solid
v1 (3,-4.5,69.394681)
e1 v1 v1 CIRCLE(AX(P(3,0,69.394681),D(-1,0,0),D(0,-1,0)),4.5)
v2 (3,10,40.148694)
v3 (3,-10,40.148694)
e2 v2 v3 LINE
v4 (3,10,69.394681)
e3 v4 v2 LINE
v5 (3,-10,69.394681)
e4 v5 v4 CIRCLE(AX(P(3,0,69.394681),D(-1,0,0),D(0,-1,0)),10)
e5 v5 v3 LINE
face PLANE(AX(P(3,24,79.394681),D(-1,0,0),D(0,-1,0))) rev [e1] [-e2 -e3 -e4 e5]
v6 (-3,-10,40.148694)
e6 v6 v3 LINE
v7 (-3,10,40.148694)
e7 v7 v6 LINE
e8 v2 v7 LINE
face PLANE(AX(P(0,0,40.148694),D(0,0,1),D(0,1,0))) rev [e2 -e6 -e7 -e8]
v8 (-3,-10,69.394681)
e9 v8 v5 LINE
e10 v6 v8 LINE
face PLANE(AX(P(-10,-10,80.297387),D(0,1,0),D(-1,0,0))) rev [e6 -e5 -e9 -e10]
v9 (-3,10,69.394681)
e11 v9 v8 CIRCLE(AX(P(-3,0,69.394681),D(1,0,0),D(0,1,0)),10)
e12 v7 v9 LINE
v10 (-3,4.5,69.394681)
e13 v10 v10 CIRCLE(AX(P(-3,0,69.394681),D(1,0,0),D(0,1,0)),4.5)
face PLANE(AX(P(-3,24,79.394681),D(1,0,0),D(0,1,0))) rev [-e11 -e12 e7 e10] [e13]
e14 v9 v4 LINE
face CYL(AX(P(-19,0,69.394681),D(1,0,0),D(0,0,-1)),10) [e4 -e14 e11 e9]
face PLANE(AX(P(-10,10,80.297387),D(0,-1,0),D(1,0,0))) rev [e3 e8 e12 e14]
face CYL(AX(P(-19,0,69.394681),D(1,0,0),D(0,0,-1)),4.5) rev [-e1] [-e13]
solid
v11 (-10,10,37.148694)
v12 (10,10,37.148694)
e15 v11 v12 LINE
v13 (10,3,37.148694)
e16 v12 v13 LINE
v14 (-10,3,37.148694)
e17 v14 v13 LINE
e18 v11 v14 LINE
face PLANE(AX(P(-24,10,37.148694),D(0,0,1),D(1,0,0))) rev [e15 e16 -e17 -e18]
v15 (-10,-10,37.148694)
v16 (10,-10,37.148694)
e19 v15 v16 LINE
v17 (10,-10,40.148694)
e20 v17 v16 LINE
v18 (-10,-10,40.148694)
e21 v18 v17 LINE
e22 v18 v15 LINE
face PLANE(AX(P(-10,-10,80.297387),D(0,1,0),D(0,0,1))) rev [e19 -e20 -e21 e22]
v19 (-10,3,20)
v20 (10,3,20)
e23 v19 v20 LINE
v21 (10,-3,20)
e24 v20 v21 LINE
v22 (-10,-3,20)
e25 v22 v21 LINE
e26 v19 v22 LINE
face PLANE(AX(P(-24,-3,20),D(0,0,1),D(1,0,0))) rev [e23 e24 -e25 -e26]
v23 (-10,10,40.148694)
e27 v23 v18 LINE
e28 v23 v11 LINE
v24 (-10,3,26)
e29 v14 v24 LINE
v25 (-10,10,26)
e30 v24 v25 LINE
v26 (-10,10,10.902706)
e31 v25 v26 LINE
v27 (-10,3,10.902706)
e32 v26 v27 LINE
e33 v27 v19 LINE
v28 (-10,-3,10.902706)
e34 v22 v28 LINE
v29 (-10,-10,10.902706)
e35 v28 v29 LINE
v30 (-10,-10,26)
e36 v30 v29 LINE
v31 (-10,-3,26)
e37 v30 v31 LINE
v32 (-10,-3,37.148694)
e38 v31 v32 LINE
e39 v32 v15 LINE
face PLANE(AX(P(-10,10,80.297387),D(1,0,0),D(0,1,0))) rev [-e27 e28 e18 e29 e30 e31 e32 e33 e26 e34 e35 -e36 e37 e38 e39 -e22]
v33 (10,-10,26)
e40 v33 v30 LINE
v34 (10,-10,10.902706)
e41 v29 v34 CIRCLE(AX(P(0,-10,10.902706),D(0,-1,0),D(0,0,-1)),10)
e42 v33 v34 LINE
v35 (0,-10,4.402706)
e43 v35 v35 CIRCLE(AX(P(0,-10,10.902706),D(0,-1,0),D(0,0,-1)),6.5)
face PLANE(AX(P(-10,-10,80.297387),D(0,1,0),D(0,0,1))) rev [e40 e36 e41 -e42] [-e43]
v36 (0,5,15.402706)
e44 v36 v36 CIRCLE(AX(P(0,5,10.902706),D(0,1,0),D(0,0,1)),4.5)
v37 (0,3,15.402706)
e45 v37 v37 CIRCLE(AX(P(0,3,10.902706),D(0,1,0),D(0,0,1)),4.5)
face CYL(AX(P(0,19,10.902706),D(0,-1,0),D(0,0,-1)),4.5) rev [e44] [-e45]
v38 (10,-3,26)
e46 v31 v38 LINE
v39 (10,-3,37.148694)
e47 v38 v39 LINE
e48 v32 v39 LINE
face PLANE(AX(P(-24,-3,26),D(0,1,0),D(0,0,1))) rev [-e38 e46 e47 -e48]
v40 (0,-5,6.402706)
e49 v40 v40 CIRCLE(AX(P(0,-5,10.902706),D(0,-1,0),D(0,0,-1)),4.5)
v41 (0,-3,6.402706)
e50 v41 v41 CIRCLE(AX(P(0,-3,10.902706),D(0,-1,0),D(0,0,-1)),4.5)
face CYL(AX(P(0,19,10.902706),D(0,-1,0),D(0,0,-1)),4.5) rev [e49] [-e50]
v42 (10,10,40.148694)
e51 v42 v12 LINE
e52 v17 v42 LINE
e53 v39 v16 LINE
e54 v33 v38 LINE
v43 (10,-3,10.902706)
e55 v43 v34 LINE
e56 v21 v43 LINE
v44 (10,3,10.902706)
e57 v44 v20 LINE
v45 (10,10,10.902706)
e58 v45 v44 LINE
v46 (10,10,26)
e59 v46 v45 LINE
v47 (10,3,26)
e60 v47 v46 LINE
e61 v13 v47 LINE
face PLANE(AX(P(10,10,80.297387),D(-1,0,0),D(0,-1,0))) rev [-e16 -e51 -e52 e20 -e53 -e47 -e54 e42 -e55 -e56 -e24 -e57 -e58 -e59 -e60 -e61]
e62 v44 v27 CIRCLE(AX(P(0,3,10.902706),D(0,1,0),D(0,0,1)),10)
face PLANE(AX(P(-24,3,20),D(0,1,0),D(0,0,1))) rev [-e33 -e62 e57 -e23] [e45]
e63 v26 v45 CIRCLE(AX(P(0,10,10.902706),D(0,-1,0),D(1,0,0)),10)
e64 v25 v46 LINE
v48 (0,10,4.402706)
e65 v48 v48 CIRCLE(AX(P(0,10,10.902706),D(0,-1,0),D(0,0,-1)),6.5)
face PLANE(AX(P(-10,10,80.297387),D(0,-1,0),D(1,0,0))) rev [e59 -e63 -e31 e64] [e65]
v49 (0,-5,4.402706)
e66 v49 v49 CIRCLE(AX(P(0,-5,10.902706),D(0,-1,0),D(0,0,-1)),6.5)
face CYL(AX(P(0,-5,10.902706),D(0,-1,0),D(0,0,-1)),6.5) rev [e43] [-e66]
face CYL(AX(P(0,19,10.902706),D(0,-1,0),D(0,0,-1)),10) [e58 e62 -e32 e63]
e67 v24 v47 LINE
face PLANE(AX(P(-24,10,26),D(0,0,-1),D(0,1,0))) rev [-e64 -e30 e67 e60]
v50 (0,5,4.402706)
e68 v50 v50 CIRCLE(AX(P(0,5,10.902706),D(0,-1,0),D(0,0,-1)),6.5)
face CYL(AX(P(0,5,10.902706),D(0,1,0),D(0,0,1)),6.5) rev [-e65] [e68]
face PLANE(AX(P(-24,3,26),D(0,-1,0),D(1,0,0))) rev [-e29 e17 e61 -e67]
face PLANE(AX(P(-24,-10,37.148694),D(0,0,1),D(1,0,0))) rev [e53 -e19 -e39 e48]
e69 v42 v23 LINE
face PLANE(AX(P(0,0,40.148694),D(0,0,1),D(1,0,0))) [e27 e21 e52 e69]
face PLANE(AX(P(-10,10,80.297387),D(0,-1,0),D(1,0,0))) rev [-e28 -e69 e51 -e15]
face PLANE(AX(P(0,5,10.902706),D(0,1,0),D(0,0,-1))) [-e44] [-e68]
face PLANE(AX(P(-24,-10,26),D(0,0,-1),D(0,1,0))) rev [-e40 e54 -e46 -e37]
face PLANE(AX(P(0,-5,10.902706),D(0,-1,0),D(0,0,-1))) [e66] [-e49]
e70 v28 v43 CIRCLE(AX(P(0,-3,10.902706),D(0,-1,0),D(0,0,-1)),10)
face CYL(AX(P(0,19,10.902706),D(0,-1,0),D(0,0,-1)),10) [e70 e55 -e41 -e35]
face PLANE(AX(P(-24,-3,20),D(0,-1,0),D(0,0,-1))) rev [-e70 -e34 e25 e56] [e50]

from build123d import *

# Parameters (mm, degrees)
SKETCH_1_W          = 20
SKETCH_1_H          = 20
EXTRUDE_1_DEPTH     = 80.297387422
SKETCH_7_W          = 20
SKETCH_7_H          = 6
SKETCH_7_W_2        = 11.148693711
SKETCH_7_H_2        = 7
CUT_EXTRUDE_6_DEPTH = 34
SKETCH_2_R          = 6.5
CUT_EXTRUDE_1_DEPTH = 5
SKETCH_3_R          = 4.5
CUT_EXTRUDE_2_DEPTH = 29
MOVE_BODY_1_ANGLE   = 90
SKETCH_9_W          = 7
SKETCH_9_H          = 39.245987558
CUT_EXTRUDE_7_DEPTH = 34


# Read off the part's stored shape, not the designer's step: 교차3
with BuildPart() as part:
    # 스케치1 → 보스-돌출1 (new body)
    with BuildSketch(Plane.XY):
        Rectangle(SKETCH_1_W, SKETCH_1_H)
    extrude(amount=EXTRUDE_1_DEPTH)

    # 스케치7 → 컷-돌출6 (cut)
    with BuildSketch(Plane(origin=(10, 0, 0), x_dir=(0, 0, -1), z_dir=(1, 0, 0))):
        with Locations((-10, 0)):
            Rectangle(SKETCH_7_W, SKETCH_7_H)
        with Locations((-31.574346855, 6.5)):
            Rectangle(SKETCH_7_W_2, SKETCH_7_H_2)
        with Locations((-31.574346855, -6.5)):
            Rectangle(SKETCH_7_W_2, SKETCH_7_H_2)
    extrude(amount=-CUT_EXTRUDE_6_DEPTH, mode=Mode.SUBTRACT)

    # 스케치2 → 컷-돌출1 (cut)
    with BuildSketch(Plane(origin=(0, -10, 0), x_dir=(-1, 0, 0), z_dir=(0, -1, 0))):
        with Locations(Location((0, -10.902706153, 0), (0, 0, 90))):
            Circle(SKETCH_2_R)
    cut_extrude_1 = extrude(amount=-CUT_EXTRUDE_1_DEPTH, mode=Mode.SUBTRACT)

    # 대칭 복사7: 컷-돌출1 across plane
    add(cut_extrude_1.mirror(Plane.ZX), mode=Mode.SUBTRACT)

    # 스케치3 → 컷-돌출2 (cut)
    with BuildSketch(Plane(origin=(0, -10, 0), x_dir=(-1, 0, 0), z_dir=(0, -1, 0))):
        with Locations(Location((0, -10.902706153, 0), (0, 0, 270))):
            Circle(SKETCH_3_R)
        with BuildLine():
            Line((-21.262122506, -10.902706153), (-10, -10.902706153))
            ThreePointArc((-10, -10.902706153), (0, -0.902706153), (10, -10.902706153))
            Line((10, -10.902706153), (21.262122506, -10.902706153))
            ThreePointArc((21.262122506, -10.902706153), (0, 10.359416353), (-21.262122506, -10.902706153))
        make_face()
    cut_extrude_2 = extrude(amount=-CUT_EXTRUDE_2_DEPTH, mode=Mode.SUBTRACT)

    # 대칭 복사6: 컷-돌출2 across plane
    add(cut_extrude_2.mirror(Plane.XY.offset(40.148693711)), mode=Mode.SUBTRACT)


with BuildPart() as body_2:
    # 교차3: the piece on the far side of the plane
    add(part.part)
    split(bisect_by=Plane.XY.offset(40.148693711), keep=Keep.BOTTOM)


with BuildPart() as part_1:
    add(part.part)

    # 교차3
    split(bisect_by=Plane.XY.offset(40.148693711), keep=Keep.TOP)


with BuildPart() as part_2:
    # Move Body 1: moved
    add(part_1.part.rotate(Axis((0, 0, 0), (0, 0, 1)), MOVE_BODY_1_ANGLE))

    # 스케치9 → 컷-돌출7 (cut)
    with BuildSketch(Plane.XZ.offset(10)):
        with Locations((6.5, 59.77168749)):
            Rectangle(SKETCH_9_W, SKETCH_9_H)
        with Locations((-6.5, 59.77168749)):
            Rectangle(SKETCH_9_W, SKETCH_9_H)
    extrude(amount=-CUT_EXTRUDE_7_DEPTH, mode=Mode.SUBTRACT)


solid = Compound([body_2.part, part_2.part])
